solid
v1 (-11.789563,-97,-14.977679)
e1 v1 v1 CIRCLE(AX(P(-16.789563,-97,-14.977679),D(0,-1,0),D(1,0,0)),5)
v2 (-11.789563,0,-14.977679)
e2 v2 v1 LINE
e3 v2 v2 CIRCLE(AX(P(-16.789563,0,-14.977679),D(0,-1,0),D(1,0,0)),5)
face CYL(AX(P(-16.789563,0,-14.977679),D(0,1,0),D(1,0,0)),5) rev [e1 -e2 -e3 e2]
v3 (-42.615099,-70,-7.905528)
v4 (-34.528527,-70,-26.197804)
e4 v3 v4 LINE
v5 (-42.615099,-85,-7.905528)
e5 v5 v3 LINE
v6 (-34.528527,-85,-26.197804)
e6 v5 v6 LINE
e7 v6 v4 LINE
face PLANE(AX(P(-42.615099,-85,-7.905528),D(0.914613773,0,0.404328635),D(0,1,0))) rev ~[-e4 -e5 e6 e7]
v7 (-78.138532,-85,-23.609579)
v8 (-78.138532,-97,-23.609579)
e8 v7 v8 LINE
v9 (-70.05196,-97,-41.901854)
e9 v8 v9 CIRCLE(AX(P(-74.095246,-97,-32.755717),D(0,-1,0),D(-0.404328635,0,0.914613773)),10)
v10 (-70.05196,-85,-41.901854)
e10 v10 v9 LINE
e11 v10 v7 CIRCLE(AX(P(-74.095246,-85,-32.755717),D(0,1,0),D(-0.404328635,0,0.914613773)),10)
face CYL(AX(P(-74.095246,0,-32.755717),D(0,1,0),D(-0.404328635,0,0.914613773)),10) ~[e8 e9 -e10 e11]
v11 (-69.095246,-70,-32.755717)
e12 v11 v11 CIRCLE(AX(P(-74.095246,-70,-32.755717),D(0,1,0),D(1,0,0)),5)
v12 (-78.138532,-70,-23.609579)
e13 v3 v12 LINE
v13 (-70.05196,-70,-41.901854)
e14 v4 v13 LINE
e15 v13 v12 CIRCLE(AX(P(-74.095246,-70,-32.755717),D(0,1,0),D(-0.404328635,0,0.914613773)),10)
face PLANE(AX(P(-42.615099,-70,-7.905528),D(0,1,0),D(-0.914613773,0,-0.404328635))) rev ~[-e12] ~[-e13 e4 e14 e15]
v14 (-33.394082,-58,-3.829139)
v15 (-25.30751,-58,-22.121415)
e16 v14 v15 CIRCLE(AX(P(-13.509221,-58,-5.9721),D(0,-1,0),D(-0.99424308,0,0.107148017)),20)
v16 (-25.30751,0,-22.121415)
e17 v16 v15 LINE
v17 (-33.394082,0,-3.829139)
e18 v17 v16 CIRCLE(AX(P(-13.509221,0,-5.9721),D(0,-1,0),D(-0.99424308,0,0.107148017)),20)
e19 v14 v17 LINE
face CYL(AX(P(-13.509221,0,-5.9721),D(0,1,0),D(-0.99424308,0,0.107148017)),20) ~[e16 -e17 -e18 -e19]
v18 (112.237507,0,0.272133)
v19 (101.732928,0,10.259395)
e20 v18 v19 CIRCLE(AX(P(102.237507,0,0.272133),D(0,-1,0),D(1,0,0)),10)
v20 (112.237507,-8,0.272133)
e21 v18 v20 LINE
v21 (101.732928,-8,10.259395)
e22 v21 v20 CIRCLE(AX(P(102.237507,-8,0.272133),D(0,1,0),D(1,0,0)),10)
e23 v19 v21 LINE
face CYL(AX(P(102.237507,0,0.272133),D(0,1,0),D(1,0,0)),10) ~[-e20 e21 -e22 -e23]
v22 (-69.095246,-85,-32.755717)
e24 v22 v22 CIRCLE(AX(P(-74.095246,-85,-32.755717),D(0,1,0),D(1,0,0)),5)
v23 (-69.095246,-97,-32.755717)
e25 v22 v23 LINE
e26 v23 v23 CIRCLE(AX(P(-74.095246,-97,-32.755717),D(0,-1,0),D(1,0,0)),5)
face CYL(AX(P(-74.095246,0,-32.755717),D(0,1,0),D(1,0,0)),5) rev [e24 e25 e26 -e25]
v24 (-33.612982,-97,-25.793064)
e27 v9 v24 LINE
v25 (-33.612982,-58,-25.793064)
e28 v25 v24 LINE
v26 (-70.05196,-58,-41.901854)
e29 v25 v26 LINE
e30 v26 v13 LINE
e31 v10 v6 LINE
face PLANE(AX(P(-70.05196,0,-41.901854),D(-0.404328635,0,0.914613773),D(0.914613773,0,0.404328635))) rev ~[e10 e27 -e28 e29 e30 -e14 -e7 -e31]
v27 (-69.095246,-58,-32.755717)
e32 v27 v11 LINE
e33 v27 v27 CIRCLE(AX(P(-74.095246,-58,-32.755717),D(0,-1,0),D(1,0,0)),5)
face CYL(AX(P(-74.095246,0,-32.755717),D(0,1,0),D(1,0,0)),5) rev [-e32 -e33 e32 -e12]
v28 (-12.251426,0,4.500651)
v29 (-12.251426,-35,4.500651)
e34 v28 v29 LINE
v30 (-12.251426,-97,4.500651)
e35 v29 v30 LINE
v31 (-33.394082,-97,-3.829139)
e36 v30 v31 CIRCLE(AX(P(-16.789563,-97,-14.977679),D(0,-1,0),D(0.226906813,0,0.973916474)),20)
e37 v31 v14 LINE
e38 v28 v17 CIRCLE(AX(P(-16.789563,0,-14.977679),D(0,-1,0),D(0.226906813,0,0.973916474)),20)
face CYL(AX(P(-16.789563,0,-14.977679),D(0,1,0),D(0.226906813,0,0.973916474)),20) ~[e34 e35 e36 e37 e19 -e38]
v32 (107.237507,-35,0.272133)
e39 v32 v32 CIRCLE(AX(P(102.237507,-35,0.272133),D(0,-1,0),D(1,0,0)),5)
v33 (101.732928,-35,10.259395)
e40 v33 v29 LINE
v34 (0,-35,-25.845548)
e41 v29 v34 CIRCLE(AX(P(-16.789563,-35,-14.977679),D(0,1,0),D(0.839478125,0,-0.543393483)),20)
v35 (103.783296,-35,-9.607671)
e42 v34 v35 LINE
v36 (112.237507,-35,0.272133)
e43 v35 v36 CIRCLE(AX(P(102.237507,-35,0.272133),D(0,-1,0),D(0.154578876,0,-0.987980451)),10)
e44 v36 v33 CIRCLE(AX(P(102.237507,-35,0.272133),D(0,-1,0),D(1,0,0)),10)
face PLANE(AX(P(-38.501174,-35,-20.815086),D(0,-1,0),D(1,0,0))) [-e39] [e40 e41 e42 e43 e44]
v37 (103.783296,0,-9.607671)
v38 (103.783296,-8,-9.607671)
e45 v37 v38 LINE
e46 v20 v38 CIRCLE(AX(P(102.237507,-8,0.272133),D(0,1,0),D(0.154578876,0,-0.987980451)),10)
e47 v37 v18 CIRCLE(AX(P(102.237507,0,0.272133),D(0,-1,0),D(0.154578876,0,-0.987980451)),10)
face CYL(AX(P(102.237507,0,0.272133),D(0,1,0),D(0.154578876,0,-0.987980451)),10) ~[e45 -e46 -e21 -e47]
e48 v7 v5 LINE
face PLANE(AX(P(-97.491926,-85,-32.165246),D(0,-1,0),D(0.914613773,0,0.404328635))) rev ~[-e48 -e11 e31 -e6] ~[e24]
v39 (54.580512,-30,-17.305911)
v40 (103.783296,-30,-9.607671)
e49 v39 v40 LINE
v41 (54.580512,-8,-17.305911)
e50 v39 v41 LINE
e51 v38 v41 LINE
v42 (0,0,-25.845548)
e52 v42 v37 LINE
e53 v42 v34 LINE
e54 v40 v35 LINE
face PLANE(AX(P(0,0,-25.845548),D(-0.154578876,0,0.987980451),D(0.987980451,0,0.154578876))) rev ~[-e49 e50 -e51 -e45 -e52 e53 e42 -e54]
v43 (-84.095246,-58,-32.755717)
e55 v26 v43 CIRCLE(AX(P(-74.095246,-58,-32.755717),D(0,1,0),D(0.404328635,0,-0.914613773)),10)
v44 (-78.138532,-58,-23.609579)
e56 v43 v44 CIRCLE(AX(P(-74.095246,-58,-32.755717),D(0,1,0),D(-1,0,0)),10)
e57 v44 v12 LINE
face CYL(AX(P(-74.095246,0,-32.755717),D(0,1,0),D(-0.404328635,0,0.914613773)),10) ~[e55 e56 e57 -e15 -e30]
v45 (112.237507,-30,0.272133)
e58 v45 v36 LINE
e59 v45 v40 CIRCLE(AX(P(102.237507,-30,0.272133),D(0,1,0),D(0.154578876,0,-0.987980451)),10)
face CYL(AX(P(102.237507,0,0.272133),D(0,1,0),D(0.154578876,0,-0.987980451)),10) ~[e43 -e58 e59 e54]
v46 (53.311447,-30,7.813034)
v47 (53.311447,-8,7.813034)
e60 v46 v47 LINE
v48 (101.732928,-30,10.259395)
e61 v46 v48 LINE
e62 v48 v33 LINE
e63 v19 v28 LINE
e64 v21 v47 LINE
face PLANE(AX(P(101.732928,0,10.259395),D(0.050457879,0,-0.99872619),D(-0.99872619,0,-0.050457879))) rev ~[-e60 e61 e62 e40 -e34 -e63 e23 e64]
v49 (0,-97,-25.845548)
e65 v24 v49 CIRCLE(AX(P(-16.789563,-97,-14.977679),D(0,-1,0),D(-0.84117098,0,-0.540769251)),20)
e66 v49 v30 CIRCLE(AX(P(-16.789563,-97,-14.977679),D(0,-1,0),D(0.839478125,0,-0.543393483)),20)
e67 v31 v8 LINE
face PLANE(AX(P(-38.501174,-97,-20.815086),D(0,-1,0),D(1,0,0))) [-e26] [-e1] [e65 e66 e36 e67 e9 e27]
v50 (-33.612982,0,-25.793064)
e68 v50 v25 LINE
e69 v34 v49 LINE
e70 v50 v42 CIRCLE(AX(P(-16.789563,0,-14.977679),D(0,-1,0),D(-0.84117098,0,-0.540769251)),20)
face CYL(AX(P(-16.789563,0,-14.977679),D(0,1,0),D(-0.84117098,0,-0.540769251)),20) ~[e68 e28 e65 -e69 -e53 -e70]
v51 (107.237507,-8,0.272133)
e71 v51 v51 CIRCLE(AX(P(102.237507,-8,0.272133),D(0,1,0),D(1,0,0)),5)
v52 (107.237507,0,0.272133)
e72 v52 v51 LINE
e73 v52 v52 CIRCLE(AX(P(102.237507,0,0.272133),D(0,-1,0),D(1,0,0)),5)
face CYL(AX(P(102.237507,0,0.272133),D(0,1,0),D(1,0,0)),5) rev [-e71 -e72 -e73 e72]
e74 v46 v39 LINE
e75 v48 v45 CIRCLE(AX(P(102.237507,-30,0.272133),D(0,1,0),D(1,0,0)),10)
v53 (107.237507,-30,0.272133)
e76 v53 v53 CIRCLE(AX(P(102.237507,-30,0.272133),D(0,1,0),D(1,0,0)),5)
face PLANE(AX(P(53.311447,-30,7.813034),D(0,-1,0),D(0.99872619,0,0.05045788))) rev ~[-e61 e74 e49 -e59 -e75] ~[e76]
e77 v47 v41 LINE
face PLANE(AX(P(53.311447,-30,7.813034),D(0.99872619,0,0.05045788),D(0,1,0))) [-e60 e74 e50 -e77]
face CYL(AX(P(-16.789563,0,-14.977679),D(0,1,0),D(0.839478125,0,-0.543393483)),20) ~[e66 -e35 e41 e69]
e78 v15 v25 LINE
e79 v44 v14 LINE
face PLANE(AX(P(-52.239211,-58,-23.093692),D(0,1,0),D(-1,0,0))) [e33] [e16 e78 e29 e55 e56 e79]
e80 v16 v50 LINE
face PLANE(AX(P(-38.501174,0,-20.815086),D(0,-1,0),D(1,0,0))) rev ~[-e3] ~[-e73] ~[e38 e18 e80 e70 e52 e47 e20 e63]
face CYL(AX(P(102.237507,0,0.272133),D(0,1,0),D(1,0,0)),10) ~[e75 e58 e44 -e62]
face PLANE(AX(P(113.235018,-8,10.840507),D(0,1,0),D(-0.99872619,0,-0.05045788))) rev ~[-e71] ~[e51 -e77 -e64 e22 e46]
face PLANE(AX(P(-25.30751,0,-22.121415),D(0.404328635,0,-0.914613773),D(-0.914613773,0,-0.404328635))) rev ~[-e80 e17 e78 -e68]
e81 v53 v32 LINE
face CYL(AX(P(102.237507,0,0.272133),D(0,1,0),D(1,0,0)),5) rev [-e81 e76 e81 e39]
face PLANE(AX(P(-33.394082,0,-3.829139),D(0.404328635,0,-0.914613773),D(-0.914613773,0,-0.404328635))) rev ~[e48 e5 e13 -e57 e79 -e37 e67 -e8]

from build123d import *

# Parameters (mm, degrees)
F0_R     = 5
F1_DEPTH = 97
F2_DEPTH = 35
F3_R     = 5
F4_DEPTH = 58
F5_W     = 21.1601814699
F5_H     = 15
F5_W_2   = 38.8398185301
F6_DEPTH = 94.4868054059
F7_W     = 48.4832398096
F7_H     = 22
F7_W_2   = 11.5167601904
F8_DEPTH = 53.4786196206


with BuildPart() as f1:
    # F0 (on Front) → F1 (new body)
    with BuildSketch(Plane.XZ):
        with BuildLine():
            Line((-33.3940822773, -3.829139489), (-78.1385323231, -23.6095790069))
            ThreePointArc((-78.1385323231, -23.6095790069), (-83.2413837038, -36.7990030954), (-70.0519596153, -41.9018544761))
            Line((-70.0519596153, -41.9018544761), (-33.6129821019, -25.7930635521))
            ThreePointArc((-33.6129821019, -25.7930635521), (-16.8207912618, -34.9776541604), (0, -25.8455482049))
            ThreePointArc((0, -25.8455482049), (1.7560740266, -7.4903982751), (-12.2514262399, 4.5006509372))
            ThreePointArc((-12.2514262399, 4.5006509372), (-24.1207121326, 3.6302295915), (-33.3940822773, -3.829139489))
        make_face()
        with Locations((-74.0952459692, -32.7557167415)):
            Circle(F0_R, mode=Mode.SUBTRACT)
        with Locations((-16.789562501, -14.9776785413)):
            Circle(F0_R, mode=Mode.SUBTRACT)
    extrude(amount=F1_DEPTH)

    # F0 (on Front) → F2 (join)
    with BuildSketch(Plane.XZ):
        with BuildLine():
            Line((-33.3940822773, -3.829139489), (-78.1385323231, -23.6095790069))
            ThreePointArc((-78.1385323231, -23.6095790069), (-83.2413837038, -36.7990030954), (-70.0519596153, -41.9018544761))
            Line((-70.0519596153, -41.9018544761), (-33.6129821019, -25.7930635521))
            ThreePointArc((-33.6129821019, -25.7930635521), (-16.8207912618, -34.9776541604), (0, -25.8455482049))
            ThreePointArc((0, -25.8455482049), (1.7560740266, -7.4903982751), (-12.2514262399, 4.5006509372))
            ThreePointArc((-12.2514262399, 4.5006509372), (-24.1207121326, 3.6302295915), (-33.3940822773, -3.829139489))
        make_face()
        with Locations((-74.0952459692, -32.7557167415)):
            Circle(F0_R, mode=Mode.SUBTRACT)
        with Locations((-16.789562501, -14.9776785413)):
            Circle(F0_R, mode=Mode.SUBTRACT)
        with BuildLine():
            Line((101.7329280454, 10.2593952934), (-12.2514262399, 4.5006509372))
            ThreePointArc((-12.2514262399, 4.5006509372), (1.7560740266, -7.4903982751), (0, -25.8455482049))
            Line((0, -25.8455482049), (103.7832955951, -9.6076711141))
            ThreePointArc((103.7832955951, -9.6076711141), (92.2903408389, -0.7544573444), (101.7329280454, 10.2593952934))
        make_face()
        with BuildLine():
            ThreePointArc((112.2375068401, 0.2721333944), (109.1278701125, 7.5194014295), (101.7329280454, 10.2593952934))
            ThreePointArc((101.7329280454, 10.2593952934), (92.2903408389, -0.7544573444), (103.7832955951, -9.6076711141))
            ThreePointArc((103.7832955951, -9.6076711141), (109.8354633926, -6.2294861135), (112.2375068401, 0.2721333944))
        make_face()
        with Locations((102.2375068401, 0.2721333944)):
            Circle(F0_R, mode=Mode.SUBTRACT)
    extrude(amount=F2_DEPTH)

    # F3 (on face) → F4 (cut)
    with BuildSketch(Plane(origin=(0, 0, 0), x_dir=(-1, 0, 0), z_dir=(0, 1, 0))):
        with BuildLine():
            ThreePointArc((33.3940822773, -3.829139489), (31.8014961432, -14.0586725369), (25.3075095695, -22.1214149583))
            Line((25.3075095695, -22.1214149583), (33.6129821019, -25.7930635521))
            Line((33.6129821019, -25.7930635521), (70.0519596153, -41.9018544761))
            ThreePointArc((70.0519596153, -41.9018544761), (64.9491082346, -28.7124303876), (78.1385323231, -23.6095790069))
            Line((78.1385323231, -23.6095790069), (33.3940822773, -3.829139489))
        make_face()
        with BuildLine():
            ThreePointArc((84.0952459692, -32.7557167415), (82.4747705243, -27.2982843571), (78.1385323231, -23.6095790069))
            ThreePointArc((78.1385323231, -23.6095790069), (64.9491082346, -28.7124303876), (70.0519596153, -41.9018544761))
            ThreePointArc((70.0519596153, -41.9018544761), (79.5526783536, -41.1352412966), (84.0952459692, -32.7557167415))
        make_face()
        with Locations((74.0952459692, -32.7557167415)):
            Circle(F3_R, mode=Mode.SUBTRACT)
    extrude(amount=-F4_DEPTH, mode=Mode.SUBTRACT)

    # F5 (on face) → F6 (cut, through all)
    with BuildSketch(Plane(origin=(-4.0432863539, 0, 9.1461377346), x_dir=(0.9146137735, 0, 0.4043286354), z_dir=(-0.4043286354, 0, 0.9146137735))):
        with Locations((-91.5926974976, -77.5)):
            Rectangle(F5_W, F5_H)
        with Locations((-61.5926974976, -77.5)):
            Rectangle(F5_W_2, F5_H)
    extrude(amount=-F6_DEPTH, mode=Mode.SUBTRACT)

    # F7 (on face) → F8 (cut, through all)
    with BuildSketch(Plane(origin=(-0.2579961306, 0, 5.1065858341), x_dir=(0.9987261899, 0, 0.0504578795), z_dir=(-0.0504578795, 0, 0.9987261899))):
        with Locations((77.8793870409, -19)):
            Rectangle(F7_W, F7_H)
        with Locations((107.8793870409, -19)):
            Rectangle(F7_W_2, F7_H)
    extrude(amount=-F8_DEPTH, mode=Mode.SUBTRACT)


solid = f1.part
